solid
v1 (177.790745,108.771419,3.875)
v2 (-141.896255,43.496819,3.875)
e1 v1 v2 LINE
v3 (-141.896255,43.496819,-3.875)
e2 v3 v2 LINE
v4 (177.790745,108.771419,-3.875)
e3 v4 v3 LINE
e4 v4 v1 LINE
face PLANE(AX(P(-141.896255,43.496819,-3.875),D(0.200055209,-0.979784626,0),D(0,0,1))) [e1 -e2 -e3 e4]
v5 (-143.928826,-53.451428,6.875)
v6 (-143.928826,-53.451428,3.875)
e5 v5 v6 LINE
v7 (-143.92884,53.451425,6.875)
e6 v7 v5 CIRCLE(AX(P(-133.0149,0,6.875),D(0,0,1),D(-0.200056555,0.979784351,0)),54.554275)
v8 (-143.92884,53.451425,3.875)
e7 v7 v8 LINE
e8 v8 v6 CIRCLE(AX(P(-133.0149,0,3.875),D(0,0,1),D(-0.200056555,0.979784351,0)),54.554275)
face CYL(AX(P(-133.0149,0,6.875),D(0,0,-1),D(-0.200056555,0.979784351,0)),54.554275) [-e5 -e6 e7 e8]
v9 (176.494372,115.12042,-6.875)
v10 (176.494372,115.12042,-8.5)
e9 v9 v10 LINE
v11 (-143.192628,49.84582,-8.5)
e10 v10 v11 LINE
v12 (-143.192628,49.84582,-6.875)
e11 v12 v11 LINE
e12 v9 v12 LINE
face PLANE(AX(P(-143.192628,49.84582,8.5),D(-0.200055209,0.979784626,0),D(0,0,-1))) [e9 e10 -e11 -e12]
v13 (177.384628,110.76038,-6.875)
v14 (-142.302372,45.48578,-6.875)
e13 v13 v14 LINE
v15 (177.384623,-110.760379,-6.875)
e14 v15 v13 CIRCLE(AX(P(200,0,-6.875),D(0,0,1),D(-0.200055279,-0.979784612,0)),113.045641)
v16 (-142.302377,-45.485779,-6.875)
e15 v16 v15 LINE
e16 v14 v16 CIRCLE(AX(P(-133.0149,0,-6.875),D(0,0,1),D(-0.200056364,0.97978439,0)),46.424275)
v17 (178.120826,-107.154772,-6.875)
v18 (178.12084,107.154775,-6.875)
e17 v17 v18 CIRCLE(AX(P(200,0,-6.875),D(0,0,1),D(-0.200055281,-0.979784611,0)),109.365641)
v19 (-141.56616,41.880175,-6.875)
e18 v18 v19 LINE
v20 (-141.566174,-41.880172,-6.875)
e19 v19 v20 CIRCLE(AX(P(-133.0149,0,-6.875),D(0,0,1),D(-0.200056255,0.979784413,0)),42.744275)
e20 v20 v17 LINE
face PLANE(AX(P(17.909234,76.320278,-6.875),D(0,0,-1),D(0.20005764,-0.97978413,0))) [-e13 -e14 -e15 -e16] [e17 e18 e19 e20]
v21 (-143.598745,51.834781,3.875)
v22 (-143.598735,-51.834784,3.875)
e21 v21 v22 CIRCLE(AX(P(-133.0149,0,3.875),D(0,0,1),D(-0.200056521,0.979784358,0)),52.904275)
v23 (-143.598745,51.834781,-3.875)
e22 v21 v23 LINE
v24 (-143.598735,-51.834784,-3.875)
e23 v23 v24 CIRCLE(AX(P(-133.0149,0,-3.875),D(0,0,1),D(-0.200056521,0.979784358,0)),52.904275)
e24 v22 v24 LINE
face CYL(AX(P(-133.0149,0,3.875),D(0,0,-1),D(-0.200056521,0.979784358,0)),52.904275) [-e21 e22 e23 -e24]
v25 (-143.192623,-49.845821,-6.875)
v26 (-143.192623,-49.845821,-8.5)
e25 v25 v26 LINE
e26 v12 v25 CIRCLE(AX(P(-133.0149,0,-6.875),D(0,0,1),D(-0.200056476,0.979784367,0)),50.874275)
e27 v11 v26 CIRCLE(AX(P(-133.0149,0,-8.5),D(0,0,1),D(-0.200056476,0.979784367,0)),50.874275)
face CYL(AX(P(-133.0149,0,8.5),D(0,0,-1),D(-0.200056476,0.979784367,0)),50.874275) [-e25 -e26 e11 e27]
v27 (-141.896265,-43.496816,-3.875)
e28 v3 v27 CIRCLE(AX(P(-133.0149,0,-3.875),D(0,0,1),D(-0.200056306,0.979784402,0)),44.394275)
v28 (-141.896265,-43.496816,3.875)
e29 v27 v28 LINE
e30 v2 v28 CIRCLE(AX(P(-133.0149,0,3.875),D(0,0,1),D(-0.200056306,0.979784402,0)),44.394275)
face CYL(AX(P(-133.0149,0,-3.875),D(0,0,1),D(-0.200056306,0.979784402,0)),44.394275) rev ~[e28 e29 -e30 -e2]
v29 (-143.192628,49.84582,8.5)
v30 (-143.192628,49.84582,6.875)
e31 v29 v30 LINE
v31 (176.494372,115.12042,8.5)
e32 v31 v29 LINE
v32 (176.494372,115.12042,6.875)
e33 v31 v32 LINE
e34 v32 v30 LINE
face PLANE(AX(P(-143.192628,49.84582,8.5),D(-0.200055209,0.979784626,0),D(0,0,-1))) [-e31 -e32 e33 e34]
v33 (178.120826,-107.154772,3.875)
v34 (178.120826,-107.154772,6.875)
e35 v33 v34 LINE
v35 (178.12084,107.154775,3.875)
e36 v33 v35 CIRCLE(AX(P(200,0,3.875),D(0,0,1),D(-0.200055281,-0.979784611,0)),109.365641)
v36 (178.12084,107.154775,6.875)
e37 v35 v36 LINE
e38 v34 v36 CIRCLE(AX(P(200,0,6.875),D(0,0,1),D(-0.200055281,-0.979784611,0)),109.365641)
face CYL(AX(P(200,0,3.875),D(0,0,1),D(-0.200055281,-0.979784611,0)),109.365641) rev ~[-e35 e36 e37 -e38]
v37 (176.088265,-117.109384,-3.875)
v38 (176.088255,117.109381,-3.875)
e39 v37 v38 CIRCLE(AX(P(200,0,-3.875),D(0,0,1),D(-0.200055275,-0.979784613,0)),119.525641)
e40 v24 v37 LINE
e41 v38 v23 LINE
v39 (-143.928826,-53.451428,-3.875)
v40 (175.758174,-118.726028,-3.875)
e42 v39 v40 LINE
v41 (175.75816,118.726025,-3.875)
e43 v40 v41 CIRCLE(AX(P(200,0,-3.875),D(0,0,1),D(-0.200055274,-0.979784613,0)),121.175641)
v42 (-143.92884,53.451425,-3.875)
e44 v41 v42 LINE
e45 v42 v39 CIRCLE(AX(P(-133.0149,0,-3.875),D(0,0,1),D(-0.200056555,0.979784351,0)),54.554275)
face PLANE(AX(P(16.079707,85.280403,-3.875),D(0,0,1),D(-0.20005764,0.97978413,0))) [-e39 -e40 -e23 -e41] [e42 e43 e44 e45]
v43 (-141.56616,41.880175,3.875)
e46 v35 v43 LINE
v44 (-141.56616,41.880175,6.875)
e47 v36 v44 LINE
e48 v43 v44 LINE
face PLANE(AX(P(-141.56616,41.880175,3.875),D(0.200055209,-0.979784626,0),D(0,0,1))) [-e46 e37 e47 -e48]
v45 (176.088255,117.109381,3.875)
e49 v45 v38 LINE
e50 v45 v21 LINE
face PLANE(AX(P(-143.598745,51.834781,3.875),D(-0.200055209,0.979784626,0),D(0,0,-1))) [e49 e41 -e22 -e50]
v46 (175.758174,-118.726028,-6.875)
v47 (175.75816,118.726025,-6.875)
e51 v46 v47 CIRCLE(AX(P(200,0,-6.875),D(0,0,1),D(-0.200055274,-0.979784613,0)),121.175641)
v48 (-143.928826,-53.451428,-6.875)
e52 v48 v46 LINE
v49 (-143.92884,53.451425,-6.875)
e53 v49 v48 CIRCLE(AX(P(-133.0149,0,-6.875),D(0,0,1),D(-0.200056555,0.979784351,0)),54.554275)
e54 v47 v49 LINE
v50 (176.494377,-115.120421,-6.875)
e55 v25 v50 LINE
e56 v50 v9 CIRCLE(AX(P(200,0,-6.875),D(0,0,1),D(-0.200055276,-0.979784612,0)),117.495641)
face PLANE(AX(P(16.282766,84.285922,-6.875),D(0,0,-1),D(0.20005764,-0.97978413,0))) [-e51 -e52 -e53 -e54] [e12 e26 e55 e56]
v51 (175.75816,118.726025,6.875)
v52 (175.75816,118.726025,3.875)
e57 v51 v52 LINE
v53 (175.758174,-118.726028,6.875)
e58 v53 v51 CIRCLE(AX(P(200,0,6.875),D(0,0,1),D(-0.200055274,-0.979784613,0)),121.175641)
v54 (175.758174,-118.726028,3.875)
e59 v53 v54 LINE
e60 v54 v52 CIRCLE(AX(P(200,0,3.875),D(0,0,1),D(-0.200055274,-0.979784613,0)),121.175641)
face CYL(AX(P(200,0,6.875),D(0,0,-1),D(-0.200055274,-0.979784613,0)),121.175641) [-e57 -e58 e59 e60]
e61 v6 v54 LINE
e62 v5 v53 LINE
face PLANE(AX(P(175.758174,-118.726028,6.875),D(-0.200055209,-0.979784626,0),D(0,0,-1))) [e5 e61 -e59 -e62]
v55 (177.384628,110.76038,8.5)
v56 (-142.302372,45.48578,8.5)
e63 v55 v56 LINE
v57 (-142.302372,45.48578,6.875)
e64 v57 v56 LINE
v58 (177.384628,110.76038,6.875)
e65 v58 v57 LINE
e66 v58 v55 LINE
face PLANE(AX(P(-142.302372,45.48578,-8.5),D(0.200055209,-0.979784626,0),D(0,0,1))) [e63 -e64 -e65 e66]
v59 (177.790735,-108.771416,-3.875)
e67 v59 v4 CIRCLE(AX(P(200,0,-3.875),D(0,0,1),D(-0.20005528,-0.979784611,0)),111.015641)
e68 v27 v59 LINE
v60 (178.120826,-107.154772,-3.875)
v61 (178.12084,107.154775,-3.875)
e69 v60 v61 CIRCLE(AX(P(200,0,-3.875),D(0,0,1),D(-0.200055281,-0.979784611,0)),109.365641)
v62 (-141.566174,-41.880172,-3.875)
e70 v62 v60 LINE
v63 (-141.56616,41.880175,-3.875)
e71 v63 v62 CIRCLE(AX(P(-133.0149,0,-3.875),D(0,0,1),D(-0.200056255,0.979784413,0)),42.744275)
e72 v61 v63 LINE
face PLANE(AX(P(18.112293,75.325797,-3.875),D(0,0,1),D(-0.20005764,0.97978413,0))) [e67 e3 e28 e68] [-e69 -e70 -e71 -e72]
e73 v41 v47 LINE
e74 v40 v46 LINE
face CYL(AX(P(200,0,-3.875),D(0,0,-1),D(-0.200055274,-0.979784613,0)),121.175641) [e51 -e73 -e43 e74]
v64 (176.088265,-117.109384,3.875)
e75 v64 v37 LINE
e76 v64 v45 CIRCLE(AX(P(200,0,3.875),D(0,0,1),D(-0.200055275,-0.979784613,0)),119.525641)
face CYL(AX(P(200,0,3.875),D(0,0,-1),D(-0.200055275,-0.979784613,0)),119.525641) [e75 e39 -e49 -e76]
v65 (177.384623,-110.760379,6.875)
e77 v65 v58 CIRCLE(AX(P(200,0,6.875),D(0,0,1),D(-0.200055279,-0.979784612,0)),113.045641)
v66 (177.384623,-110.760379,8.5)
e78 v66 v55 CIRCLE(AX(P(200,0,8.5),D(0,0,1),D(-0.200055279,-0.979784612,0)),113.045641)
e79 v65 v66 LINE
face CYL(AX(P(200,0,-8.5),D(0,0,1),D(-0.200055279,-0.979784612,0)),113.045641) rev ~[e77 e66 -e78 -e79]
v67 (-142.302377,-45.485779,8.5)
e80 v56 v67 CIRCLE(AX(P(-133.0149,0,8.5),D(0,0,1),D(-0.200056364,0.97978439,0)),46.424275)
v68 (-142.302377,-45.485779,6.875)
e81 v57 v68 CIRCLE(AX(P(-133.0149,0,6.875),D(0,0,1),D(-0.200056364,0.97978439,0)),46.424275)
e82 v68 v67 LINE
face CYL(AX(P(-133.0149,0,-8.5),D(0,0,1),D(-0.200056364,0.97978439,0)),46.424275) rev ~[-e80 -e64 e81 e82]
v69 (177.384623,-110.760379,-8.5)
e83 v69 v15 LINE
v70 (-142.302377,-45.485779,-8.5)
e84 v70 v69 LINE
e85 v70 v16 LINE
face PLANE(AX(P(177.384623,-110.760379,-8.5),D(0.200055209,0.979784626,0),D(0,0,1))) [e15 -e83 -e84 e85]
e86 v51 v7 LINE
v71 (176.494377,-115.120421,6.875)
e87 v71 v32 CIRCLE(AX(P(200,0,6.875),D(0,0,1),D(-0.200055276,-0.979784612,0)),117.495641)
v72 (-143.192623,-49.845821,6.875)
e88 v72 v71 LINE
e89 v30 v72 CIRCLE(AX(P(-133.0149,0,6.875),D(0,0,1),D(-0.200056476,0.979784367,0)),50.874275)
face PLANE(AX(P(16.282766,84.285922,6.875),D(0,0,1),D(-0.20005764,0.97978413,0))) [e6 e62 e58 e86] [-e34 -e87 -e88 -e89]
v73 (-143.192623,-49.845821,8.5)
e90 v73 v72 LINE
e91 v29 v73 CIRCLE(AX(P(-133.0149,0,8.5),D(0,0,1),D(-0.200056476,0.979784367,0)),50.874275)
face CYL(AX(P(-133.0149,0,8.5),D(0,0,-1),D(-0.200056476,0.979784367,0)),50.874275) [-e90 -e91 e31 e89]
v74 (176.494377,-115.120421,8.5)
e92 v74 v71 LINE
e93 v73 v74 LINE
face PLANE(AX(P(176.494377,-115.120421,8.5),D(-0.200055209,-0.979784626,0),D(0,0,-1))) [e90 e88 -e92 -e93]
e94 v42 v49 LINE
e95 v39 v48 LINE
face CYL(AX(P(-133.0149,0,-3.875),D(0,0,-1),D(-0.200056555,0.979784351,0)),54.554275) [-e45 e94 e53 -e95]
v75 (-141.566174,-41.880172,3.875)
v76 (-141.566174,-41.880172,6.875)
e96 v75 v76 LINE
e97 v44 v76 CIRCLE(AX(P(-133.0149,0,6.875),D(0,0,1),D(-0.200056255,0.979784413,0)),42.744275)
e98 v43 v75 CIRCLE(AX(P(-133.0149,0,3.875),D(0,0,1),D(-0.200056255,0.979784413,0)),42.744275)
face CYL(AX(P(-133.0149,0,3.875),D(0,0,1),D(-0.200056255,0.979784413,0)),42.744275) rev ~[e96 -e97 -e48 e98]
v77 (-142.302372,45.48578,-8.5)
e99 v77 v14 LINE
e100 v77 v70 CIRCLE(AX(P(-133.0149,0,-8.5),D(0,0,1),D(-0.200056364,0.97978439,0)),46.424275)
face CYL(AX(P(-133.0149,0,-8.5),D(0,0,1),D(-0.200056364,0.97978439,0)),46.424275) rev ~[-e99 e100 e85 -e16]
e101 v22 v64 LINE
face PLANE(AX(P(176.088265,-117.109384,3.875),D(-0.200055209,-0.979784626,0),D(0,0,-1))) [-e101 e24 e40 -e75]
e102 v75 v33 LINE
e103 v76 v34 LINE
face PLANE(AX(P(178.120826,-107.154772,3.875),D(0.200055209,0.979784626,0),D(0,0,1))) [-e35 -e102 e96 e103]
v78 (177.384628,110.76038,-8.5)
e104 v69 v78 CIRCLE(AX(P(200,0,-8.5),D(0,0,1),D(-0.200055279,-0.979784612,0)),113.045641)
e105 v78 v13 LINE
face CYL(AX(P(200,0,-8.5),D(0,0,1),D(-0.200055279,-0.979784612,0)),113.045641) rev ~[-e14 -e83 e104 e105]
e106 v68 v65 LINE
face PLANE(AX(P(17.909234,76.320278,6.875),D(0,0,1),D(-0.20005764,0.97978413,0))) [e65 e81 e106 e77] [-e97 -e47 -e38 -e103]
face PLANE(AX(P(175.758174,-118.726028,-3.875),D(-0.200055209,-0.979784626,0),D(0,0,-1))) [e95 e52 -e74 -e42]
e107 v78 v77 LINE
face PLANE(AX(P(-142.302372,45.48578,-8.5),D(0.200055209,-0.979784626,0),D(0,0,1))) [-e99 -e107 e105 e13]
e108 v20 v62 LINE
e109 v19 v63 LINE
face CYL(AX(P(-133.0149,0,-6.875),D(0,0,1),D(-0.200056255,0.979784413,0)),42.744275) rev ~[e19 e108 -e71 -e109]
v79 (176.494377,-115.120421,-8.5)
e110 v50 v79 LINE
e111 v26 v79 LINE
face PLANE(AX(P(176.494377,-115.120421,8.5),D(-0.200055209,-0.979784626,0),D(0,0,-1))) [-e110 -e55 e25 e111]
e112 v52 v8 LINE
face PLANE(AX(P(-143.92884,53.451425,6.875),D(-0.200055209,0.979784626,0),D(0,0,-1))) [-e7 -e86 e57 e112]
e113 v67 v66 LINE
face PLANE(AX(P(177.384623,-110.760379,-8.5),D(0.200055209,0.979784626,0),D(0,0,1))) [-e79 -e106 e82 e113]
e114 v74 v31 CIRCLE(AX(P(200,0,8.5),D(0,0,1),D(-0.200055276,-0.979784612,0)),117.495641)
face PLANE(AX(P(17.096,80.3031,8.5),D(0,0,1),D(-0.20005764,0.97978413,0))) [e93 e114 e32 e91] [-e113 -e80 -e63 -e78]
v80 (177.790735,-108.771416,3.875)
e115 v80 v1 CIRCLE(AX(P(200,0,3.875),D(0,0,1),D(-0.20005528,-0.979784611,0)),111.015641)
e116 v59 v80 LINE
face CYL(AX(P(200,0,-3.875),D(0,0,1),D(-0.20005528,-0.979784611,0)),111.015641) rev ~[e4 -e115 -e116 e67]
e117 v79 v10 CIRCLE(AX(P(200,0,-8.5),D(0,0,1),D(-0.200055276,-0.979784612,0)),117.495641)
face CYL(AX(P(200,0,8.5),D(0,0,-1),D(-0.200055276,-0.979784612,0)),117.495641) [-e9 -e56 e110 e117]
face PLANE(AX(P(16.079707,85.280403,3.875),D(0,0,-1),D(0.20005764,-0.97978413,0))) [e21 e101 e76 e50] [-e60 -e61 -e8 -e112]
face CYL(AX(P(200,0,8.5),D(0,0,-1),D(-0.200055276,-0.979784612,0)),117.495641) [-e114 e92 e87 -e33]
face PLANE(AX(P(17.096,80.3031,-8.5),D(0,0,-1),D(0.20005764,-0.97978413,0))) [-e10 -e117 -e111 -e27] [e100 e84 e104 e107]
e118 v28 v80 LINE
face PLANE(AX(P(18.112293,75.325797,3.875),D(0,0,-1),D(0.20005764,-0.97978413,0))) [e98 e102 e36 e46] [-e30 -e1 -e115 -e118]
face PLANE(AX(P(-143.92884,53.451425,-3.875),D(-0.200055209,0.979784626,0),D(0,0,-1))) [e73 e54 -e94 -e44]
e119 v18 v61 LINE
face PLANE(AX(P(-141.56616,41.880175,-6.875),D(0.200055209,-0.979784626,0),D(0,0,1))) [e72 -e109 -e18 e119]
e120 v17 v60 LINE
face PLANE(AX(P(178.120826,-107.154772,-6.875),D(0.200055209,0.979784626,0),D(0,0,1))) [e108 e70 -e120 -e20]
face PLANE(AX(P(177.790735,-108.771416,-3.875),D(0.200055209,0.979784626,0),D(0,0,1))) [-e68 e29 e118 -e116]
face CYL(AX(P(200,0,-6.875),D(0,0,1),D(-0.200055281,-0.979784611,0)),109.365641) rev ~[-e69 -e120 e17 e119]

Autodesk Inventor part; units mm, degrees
ref_plane "Work Plane2" through (-133.0149, 0, 0) normal (-1, 0, 0) x (0, 0, 1)
ref_plane "Work Plane3" through (200, 0, 0) normal (-0.9814515, -0.1917106, 0) x (0, 0, 1)
sketch "Path" plane through (0, 0, 0) normal (0, 0, 1) x (1, 0, 0)
  arc A0 (-142.7475, 47.6658) -> (-142.7475, -47.6658) centre (-133.0149, 0) ccw
  arc A1 (176.9395, -112.9404) -> (176.9395, 112.9404) centre (200, 0) ccw
  line L0 (176.9395, -112.9404) -> (-142.7475, -47.6658)
  line L1 (-142.7475, 47.6658) -> (176.9395, 112.9404)
  dimension "d31" = 11.81
ref_plane "Section Plane" through (-142.7475, -47.6658, 0) normal (0.9797846, -0.2000552, 0) x (0, 0, 1)
sketch "Section Sketch" plane through (-142.7475, -47.6658, 0) normal (0.9797846, -0.2000552, 0) x (0, 0, 1)
  line L0 (-8.5, -2.225) -> (8.5, -2.225)
  line L1 (8.5, -2.225) -> (8.5, 2.225)
  line L2 (8.5, 2.225) -> (-8.5, 2.225)
  line L3 (-8.5, 2.225) -> (-8.5, -2.225)
  line L4 (-3.875, -4.255) -> (3.875, -4.255)
  line L5 (3.875, -4.255) -> (3.875, 4.255)
  line L6 (3.875, 4.255) -> (-3.875, 4.255)
  line L7 (-3.875, 4.255) -> (-3.875, -4.255)
  line L8 (-3.875, 0) -> (3.875, 0) construction
  line L9 (-6.875, -5.905) -> (-3.875, -5.905)
  line L10 (-3.875, -5.905) -> (-3.875, 5.905)
  line L11 (-3.875, 5.905) -> (-6.875, 5.905)
  line L12 (-6.875, 5.905) -> (-6.875, -5.905)
  line L13 (3.875, -5.905) -> (6.875, -5.905)
  line L14 (6.875, -5.905) -> (6.875, 5.905)
  line L15 (6.875, 5.905) -> (3.875, 5.905)
  line L16 (3.875, 5.905) -> (3.875, -5.905)
  line L17 (-8.5, 0) -> (8.5, 0) construction
  point P0 (0, 0)
  point P1 (0, 0)
  dimension "d21" = 4.45
  dimension "d22" = 8.51
  dimension "d23" = 7.75
  dimension "d24" = 3
  dimension "d31" = 11.81
  dimension "d32" = 17
sweep "Solid" add profiles "Section Sketch" path "Path"
pattern_of_one "Strand Pattern"
equation "\"d21\" = da_d2"
equation "\"d22\" = da_d1"
equation "\"d23\" = da_b1"
equation "\"d24\" = da_t1 + da_t2"
equation "\"d30\" = da_pt"
equation "\"da_p\" = 12.7"
equation "\"da_b1\" = 7.75"
equation "\"da_h2\" = 11.81"
equation "\"da_h3\" = 10.92"
equation "\"da_d1\" = 8.51"
equation "\"da_d2\" = 4.45"
equation "\"da_pt\" = 13.92"
equation "\"da_b\" = 17"
equation "\"da_t1\" = 1.5"
equation "\"da_t2\" = 1.5"
properties part number "Roller Chain"
